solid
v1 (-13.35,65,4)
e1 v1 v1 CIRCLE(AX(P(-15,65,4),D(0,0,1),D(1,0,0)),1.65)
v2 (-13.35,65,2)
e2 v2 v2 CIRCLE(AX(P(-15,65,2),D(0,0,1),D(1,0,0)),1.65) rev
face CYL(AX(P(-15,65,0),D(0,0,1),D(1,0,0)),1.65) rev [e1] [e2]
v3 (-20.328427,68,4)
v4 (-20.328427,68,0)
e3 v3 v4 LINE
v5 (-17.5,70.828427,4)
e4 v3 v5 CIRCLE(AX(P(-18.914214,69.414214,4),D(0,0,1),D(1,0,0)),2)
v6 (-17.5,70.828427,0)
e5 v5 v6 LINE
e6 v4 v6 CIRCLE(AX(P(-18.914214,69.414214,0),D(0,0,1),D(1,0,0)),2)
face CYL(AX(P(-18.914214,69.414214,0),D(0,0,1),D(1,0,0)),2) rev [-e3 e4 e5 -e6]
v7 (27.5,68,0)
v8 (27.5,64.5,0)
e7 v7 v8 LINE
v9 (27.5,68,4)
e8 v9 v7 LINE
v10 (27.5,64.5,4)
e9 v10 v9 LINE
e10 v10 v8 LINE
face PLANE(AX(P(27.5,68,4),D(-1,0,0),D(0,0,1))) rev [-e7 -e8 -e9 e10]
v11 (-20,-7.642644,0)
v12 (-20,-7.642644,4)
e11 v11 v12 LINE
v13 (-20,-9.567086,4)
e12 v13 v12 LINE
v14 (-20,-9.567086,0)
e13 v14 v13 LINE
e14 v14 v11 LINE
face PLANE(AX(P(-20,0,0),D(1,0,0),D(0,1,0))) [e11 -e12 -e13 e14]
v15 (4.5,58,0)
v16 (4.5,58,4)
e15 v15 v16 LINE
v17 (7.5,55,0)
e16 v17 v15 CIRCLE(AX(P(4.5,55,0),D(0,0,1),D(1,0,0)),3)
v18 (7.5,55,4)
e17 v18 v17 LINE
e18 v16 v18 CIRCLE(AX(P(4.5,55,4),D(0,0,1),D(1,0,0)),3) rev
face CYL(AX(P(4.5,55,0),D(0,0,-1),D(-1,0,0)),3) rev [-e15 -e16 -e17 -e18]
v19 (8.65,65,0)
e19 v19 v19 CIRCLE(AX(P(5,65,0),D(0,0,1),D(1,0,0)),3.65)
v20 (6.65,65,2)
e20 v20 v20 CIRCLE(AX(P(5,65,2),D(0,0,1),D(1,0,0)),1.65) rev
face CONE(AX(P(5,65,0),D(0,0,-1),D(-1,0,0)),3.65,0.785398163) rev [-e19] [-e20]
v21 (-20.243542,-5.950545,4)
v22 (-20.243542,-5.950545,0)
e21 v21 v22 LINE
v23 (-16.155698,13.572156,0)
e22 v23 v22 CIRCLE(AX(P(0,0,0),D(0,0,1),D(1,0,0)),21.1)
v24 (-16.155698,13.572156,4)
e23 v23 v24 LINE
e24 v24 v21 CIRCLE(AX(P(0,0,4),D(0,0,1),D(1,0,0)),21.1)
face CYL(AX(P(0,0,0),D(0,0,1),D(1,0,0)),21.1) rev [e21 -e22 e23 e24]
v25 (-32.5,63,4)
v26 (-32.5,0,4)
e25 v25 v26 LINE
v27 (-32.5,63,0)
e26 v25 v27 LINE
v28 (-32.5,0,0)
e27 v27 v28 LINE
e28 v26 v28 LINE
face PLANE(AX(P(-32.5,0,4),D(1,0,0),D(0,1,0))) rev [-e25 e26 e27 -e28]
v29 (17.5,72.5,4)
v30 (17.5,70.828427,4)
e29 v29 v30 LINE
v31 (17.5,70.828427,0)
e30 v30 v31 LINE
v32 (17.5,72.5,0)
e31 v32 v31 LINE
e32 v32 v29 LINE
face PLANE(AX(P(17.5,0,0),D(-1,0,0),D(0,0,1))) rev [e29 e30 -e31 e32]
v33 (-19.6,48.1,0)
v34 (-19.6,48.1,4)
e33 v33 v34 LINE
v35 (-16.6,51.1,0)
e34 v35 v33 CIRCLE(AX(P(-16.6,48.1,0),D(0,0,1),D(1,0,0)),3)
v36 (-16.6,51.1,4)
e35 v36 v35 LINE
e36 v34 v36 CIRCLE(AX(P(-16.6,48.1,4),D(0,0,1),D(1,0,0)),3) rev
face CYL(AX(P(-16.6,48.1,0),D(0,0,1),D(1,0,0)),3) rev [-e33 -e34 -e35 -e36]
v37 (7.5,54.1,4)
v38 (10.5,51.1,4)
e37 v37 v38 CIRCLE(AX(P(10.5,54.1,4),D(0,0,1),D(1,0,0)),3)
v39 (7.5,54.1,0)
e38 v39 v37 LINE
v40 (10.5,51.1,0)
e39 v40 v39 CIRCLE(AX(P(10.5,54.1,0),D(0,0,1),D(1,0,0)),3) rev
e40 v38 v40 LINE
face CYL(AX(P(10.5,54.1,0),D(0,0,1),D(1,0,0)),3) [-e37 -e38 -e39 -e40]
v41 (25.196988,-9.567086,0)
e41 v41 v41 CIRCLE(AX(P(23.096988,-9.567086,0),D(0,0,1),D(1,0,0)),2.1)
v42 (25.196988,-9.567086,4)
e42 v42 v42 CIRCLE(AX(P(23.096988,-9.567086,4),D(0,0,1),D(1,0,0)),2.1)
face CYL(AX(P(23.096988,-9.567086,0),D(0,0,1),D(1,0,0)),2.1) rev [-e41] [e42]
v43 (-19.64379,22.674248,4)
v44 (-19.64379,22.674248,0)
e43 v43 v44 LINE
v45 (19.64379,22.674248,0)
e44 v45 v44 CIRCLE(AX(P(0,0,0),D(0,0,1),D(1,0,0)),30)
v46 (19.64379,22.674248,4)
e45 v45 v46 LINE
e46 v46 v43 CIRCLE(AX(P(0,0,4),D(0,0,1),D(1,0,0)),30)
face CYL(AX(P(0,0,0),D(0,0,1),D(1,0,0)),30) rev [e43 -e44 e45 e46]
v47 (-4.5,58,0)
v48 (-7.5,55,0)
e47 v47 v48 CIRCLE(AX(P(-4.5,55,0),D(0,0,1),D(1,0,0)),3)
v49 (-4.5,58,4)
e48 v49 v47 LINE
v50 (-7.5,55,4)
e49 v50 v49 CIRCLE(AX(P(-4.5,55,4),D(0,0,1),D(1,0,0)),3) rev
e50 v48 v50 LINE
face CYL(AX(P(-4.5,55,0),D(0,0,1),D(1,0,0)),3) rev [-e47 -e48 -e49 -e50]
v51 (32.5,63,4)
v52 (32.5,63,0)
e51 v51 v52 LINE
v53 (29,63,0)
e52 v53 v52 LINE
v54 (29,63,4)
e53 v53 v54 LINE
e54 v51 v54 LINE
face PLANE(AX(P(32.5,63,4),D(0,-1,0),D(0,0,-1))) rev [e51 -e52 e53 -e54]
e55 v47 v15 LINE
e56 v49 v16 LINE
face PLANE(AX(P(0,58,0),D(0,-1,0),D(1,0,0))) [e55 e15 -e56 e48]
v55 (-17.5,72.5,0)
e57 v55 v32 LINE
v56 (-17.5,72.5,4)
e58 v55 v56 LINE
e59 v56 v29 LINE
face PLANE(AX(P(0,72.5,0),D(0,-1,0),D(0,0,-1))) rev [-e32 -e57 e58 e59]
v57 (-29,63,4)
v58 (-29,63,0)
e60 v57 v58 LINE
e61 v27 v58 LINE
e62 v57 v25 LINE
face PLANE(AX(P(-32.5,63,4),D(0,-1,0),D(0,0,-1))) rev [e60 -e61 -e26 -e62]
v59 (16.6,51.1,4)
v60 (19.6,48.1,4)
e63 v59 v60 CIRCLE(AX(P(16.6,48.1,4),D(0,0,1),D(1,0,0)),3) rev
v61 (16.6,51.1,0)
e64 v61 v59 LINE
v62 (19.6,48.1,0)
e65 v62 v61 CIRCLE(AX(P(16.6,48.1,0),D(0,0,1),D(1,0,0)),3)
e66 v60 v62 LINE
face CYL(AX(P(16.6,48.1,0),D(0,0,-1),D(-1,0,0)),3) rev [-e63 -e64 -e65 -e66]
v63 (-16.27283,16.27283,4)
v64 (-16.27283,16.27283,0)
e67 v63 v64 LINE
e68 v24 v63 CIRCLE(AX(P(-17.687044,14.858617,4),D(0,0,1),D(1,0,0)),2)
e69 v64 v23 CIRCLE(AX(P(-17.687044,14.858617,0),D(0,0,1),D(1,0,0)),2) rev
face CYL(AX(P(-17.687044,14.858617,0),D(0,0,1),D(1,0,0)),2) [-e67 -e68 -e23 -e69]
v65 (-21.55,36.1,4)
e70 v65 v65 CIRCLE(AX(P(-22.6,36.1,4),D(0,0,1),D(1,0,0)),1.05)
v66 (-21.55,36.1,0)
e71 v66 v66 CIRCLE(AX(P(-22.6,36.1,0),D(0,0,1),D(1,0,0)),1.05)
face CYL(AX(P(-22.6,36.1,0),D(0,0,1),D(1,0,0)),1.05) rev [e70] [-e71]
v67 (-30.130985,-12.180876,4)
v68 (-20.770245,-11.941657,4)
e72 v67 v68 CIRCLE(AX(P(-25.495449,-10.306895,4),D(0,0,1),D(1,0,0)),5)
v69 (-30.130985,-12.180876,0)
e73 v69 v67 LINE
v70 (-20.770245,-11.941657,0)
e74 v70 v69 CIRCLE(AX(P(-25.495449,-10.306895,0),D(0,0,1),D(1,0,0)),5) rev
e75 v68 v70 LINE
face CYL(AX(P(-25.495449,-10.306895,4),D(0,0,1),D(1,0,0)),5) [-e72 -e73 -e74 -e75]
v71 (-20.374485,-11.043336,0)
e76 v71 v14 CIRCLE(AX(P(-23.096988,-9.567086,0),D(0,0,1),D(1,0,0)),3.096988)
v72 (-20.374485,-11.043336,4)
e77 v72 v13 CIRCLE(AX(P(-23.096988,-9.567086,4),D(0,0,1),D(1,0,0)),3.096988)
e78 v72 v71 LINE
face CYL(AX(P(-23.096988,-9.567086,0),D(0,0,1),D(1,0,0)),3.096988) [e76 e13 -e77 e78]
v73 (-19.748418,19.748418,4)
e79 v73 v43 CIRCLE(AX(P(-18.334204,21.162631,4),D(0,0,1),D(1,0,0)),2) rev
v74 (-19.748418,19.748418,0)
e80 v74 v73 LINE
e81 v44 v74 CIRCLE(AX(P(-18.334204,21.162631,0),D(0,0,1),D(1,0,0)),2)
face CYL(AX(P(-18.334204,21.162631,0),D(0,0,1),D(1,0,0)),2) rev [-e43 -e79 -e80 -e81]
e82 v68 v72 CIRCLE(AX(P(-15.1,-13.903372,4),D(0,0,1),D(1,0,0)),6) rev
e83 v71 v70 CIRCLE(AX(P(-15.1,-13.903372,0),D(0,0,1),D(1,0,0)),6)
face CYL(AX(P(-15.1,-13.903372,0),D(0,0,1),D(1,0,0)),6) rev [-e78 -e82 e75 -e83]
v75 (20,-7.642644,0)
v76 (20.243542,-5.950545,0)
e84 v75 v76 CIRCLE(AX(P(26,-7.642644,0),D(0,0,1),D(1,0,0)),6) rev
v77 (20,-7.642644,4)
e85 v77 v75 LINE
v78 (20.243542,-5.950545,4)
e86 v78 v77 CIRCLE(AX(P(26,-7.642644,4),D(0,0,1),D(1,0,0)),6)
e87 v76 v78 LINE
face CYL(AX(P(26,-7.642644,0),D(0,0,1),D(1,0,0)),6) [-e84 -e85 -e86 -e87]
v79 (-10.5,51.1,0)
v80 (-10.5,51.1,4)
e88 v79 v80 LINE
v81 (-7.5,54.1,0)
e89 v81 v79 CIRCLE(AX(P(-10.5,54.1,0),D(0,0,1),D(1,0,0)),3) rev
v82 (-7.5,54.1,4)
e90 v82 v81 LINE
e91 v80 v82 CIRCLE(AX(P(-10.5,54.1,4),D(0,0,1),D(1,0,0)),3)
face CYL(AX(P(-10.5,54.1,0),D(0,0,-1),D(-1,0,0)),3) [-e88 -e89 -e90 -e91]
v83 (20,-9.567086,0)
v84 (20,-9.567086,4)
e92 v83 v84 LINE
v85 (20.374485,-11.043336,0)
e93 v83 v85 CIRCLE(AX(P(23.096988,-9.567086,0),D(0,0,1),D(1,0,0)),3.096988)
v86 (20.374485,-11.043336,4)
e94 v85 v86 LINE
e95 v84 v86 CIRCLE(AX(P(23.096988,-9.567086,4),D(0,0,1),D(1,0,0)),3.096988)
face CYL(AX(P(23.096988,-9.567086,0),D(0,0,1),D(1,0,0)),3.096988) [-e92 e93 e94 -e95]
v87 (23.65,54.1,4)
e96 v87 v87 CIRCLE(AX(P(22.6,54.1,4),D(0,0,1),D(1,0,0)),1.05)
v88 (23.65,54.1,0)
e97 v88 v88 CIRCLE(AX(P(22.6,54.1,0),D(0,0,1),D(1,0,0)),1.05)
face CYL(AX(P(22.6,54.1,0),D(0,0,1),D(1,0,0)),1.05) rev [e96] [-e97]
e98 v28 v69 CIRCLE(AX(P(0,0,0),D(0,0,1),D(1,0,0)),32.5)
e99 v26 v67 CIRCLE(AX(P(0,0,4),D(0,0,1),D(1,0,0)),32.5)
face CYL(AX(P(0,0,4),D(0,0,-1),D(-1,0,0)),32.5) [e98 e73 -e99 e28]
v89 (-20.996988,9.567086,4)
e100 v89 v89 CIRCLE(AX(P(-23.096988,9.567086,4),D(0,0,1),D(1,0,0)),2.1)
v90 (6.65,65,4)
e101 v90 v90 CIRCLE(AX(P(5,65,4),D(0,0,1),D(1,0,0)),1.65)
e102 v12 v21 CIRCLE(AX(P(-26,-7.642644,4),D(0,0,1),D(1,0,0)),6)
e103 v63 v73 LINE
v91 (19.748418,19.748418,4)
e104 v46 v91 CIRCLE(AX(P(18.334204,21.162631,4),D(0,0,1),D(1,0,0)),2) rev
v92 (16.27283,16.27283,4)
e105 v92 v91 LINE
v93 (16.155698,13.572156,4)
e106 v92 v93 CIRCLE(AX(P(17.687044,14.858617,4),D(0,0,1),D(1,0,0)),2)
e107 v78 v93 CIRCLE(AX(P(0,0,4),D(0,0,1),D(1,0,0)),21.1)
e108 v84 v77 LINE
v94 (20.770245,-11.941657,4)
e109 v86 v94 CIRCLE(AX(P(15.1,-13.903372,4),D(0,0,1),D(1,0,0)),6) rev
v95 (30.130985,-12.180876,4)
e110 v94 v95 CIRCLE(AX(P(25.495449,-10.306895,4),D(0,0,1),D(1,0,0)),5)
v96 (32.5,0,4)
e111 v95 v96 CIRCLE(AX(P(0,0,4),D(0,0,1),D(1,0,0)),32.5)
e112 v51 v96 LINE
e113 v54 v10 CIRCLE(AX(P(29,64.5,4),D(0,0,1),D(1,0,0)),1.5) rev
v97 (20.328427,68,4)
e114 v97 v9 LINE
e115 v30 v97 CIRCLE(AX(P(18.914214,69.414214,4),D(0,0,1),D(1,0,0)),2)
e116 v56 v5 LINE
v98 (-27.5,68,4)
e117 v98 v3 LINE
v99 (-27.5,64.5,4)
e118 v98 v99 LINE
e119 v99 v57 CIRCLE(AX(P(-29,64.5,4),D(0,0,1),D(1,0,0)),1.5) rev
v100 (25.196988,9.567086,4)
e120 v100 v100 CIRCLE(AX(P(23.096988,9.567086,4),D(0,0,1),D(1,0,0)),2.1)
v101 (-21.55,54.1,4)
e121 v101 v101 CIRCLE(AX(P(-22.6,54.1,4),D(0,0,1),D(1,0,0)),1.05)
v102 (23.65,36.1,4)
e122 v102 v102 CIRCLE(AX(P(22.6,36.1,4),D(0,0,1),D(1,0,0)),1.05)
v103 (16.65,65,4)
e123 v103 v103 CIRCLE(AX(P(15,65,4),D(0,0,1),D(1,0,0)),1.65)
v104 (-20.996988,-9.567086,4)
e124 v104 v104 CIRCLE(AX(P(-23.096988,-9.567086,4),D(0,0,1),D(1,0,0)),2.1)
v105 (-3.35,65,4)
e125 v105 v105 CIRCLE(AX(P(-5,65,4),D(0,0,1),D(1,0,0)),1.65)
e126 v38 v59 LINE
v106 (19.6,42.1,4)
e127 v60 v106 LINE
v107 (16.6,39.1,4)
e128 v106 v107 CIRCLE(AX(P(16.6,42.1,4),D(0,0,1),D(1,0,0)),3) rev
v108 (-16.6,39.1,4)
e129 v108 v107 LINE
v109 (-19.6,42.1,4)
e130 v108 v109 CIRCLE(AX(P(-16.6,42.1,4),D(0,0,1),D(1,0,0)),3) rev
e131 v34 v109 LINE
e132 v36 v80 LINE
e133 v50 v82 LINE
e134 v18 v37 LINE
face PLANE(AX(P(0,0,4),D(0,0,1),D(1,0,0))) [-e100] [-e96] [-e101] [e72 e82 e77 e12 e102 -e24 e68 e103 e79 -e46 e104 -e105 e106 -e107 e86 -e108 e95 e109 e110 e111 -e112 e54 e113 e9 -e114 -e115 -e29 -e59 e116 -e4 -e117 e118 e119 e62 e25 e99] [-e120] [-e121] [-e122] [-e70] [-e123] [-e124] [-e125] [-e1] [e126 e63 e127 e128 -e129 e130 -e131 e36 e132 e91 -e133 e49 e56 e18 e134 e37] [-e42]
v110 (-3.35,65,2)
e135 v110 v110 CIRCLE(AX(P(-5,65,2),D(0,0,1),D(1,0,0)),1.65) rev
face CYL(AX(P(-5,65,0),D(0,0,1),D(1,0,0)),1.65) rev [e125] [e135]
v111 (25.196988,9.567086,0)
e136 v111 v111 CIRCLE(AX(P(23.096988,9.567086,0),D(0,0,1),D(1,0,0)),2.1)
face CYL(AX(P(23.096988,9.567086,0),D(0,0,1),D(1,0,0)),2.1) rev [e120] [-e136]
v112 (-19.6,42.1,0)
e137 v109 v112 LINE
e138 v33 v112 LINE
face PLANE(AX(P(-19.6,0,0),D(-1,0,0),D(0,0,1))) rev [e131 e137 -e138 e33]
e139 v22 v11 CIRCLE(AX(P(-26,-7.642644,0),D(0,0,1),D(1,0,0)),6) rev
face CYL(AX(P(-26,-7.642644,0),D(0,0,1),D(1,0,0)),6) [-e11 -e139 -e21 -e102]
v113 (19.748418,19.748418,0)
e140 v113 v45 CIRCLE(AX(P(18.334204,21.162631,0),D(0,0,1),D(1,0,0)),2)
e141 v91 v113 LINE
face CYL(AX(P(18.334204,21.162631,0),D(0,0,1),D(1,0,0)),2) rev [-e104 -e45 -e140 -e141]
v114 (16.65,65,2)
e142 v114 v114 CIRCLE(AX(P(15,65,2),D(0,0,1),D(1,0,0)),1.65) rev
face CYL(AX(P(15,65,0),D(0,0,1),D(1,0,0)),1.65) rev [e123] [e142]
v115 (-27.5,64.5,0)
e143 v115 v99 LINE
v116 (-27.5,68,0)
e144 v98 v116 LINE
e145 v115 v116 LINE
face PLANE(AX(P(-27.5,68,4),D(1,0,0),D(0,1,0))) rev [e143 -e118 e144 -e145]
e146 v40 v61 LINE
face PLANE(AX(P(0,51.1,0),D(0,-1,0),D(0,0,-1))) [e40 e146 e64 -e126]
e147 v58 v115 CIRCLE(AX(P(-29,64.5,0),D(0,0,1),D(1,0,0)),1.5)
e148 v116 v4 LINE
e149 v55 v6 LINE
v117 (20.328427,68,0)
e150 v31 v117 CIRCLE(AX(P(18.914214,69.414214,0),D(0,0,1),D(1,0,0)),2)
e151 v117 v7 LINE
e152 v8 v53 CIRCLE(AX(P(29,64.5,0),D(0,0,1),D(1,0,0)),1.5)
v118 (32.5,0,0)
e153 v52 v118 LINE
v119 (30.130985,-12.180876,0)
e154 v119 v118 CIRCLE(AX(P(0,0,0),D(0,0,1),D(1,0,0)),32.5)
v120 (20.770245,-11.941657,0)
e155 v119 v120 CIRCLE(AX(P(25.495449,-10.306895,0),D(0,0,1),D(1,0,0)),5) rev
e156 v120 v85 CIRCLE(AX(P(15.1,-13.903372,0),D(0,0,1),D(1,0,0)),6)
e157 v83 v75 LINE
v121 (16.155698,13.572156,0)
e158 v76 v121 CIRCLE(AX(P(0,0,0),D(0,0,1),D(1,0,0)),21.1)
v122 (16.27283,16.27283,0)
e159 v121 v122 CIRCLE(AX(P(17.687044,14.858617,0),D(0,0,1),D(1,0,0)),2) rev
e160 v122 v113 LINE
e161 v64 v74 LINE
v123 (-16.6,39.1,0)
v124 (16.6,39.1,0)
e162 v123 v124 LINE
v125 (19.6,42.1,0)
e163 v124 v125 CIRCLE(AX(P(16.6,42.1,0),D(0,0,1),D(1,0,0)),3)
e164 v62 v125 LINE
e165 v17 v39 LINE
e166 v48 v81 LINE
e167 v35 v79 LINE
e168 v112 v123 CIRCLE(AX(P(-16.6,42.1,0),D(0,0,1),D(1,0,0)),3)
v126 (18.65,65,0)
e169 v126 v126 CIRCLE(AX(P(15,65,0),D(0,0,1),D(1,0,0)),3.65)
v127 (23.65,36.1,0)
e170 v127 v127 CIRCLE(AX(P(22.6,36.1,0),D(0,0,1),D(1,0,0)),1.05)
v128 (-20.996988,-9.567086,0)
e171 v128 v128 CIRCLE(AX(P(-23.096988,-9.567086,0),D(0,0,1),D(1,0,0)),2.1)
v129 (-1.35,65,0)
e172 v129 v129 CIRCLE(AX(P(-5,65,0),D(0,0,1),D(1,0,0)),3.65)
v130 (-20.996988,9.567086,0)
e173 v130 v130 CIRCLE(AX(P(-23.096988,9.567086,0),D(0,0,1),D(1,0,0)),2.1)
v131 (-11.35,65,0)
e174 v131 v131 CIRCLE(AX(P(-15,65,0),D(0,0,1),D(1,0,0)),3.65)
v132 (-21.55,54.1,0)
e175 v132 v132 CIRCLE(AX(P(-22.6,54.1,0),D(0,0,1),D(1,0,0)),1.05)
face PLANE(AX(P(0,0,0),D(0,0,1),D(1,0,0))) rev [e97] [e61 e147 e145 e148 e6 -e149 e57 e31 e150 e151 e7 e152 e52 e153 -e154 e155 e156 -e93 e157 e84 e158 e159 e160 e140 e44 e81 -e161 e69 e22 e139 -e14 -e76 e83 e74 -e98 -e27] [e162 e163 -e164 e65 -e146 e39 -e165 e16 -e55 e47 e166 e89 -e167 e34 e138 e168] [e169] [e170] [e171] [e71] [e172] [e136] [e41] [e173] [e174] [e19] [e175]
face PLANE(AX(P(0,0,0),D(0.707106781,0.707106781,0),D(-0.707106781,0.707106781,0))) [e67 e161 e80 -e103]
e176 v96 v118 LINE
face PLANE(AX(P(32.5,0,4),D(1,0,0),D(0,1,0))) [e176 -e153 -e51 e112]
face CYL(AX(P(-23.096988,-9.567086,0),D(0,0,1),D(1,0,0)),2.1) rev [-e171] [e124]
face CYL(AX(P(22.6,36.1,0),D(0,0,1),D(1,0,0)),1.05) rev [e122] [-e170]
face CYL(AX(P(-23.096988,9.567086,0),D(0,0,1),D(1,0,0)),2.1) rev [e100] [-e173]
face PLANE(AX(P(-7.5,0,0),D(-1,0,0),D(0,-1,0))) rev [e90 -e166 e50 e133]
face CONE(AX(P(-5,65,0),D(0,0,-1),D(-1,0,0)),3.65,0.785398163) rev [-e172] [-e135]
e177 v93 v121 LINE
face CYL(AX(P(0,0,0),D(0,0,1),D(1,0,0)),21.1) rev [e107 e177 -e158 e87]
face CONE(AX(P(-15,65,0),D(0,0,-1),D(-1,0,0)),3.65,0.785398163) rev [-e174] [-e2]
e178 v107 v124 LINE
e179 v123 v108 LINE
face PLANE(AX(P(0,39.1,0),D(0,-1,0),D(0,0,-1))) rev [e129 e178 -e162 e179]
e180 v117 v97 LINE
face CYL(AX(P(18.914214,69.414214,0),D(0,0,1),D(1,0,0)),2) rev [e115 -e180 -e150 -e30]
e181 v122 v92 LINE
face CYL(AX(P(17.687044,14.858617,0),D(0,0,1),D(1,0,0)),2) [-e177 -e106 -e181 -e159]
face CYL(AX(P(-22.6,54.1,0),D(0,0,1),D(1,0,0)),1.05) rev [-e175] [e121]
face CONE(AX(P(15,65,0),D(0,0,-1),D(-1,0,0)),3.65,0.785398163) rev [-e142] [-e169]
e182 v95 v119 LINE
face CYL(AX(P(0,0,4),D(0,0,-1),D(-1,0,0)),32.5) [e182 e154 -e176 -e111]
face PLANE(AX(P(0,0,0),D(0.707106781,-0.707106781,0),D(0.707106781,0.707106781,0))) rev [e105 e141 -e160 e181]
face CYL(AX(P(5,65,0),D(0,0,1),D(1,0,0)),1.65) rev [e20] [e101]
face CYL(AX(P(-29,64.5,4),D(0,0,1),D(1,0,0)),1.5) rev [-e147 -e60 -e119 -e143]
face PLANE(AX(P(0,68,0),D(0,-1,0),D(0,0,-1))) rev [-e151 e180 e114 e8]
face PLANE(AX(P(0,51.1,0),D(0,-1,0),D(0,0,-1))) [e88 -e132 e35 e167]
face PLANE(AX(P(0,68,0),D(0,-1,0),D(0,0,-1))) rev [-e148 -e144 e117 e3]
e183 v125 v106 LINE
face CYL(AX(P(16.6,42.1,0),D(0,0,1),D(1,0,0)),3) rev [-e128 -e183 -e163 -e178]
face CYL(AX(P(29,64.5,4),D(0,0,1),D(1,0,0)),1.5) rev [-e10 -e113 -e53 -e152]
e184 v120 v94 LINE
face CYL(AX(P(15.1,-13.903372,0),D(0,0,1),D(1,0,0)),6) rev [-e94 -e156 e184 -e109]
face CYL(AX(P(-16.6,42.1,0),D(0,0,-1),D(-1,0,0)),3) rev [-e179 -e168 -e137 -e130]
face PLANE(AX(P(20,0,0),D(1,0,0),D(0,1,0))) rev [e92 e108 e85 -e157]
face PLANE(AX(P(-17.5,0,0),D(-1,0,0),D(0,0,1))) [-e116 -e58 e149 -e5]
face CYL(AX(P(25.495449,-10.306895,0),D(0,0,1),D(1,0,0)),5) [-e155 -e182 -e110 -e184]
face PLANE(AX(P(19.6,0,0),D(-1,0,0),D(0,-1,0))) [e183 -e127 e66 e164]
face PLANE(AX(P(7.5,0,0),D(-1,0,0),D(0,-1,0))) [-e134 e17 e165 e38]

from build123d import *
from build123d.topology import SkipClean

# Parameters (mm, degrees)
EXTRUDE_1_DEPTH          = 4
CUT_EXTRUDE_1_DEPTH      = 87.442177205
CUT_EXTRUDE_1_DEPTH_BACK = 87.442177205
SKETCH_2_R               = 21.1
SKETCH_2_W               = 42.2
SKETCH_2_H               = 49.697757749
SKETCH_3_R               = 1.65
CUT_EXTRUDE_2_DEPTH      = 87.442177205
PATTERN_CIRCULAR_1_COUNT = 8
EXTRUDE_START            = -4
EXTRUDE_2_DEPTH          = 4
FILLET_1_R               = 6
CUT_EXTRUDE_3_DEPTH      = 87.442177205
CUT_EXTRUDE_3_DEPTH_BACK = 87.442177205
SKETCH_6_R               = 1.65
FILLET_2_R               = 2
CUT_EXTRUDE_4_DEPTH      = 87.442177205
SKETCH_8_R               = 2
CUT_EXTRUDE_5_DEPTH      = 80.551869871
CUT_EXTRUDE_6_DEPTH      = 80.551869871
CUT_EXTRUDE_6_DEPTH_BACK = 80.551869871
SKETCH_9_R               = 1.65
SKETCH_21_R              = 1.05
CUT_EXTRUDE_C620_DEPTH   = 182.304079666
CHAMFER_2_SIZE           = 2
FILLET_3_R               = 5
FILLET_4_R               = 5
CUT_EXTRUDE_7_DEPTH      = 80.551869871
CUT_EXTRUDE_7_DEPTH_BACK = 80.551869871
SKETCH_22_W              = 39.2
SKETCH_22_H              = 12
SKETCH_22_W_2            = 15
SKETCH_22_H_2            = 6.9
FILLET_5_R               = 3
CUT_EXTRUDE_8_DEPTH      = 80.551869871
CUT_EXTRUDE_8_DEPTH_BACK = 80.551869871
SKETCH_23_R              = 2.1
CUT_EXTRUDE_9_DEPTH      = 80.551869871
CUT_EXTRUDE_9_DEPTH_BACK = 80.551869871
SKETCH_24_W              = 5
SKETCH_24_H              = 5
FILLET_6_R               = 1.5


with BuildPart() as part:
    # 草图1 → 凸台-拉伸1 (new body)
    with BuildSketch(Plane.XY):
        with BuildLine():
            Line((32.5, 80), (-32.5, 80))
            Line((-32.5, 80), (-32.5, 0))
            ThreePointArc((-32.5, 0), (0, 32.5), (32.5, 0))
            Line((32.5, 0), (32.5, 80))
        make_face()
        with BuildLine():
            ThreePointArc((32.5, 0), (0, 32.5), (-32.5, 0))
            Line((-32.5, 0), (32.5, 0))
        make_face()
        with BuildLine():
            Line((32.5, 0), (-32.5, 0))
            ThreePointArc((-32.5, 0), (0, -32.5), (32.5, 0))
        make_face()
        with BuildLine():
            ThreePointArc((32.5, 0), (0, 32.5), (-32.5, 0))
            Line((-32.5, 0), (32.5, 0))
        make_face()
        with BuildLine():
            Line((32.5, 0), (-32.5, 0))
            ThreePointArc((-32.5, 0), (0, -32.5), (32.5, 0))
        make_face()
    extrude(amount=EXTRUDE_1_DEPTH)

    # 草图2 → 切除-拉伸1 (cut, two sides: drawn at the far end of the back side and taken through both)
    with BuildSketch(Plane.XY.offset(4).offset(-CUT_EXTRUDE_1_DEPTH_BACK)):
        Circle(SKETCH_2_R)
        with Locations((0, -24.848878875)):
            Rectangle(SKETCH_2_W, SKETCH_2_H)
    extrude(amount=CUT_EXTRUDE_1_DEPTH + CUT_EXTRUDE_1_DEPTH_BACK, mode=Mode.SUBTRACT)

    # 草图3 → 切除-拉伸2 (cut, symmetric)
    with BuildSketch(Plane.XY.offset(4)):
        with Locations((9.567085809, 23.096988313)):
            Circle(SKETCH_3_R)
    cut_extrude_2 = extrude(amount=CUT_EXTRUDE_2_DEPTH, both=True, mode=Mode.SUBTRACT)

    # 阵列(圆周)1: 切除-拉伸2 ×8 about axis
    pattern_circular_1_axis = Axis((0, 0, 0), (0, 0, 1))
    for i in range(1, PATTERN_CIRCULAR_1_COUNT):
        add(cut_extrude_2.rotate(pattern_circular_1_axis, i * 360 / PATTERN_CIRCULAR_1_COUNT), mode=Mode.SUBTRACT)

    # 草图4 → 凸台-拉伸2 (add)
    with SkipClean():  # the faces are left unmerged after this step: merging them gives an invalid solid
        with BuildSketch(Plane.XY.offset(4).offset(EXTRUDE_START)):
            with BuildLine():
                ThreePointArc((-21.1, -11.934230563), (-20.288431203, -10.872207862), (-20, -9.567085809))
                Line((-20, -9.567085809), (-20, -6.72383819))
                ThreePointArc((-20, -6.72383819), (-20.823184195, -3.406611219), (-21.1, 0))
                Line((-21.1, 0), (-21.1, -11.934230563))
            make_face()
            with BuildLine():
                ThreePointArc((21.1, 0), (20.823184195, -3.406611219), (20, -6.72383819))
                Line((20, -6.72383819), (20, -9.567085809))
                ThreePointArc((20, -9.567085809), (20.288431203, -10.872207862), (21.1, -11.934230563))
                Line((21.1, -11.934230563), (21.1, 0))
            make_face()
        extrude(amount=EXTRUDE_2_DEPTH)

    # 圆角1
    fillet_1_edges = [part.edges().sort_by_distance(p)[0] for p in [
        (21.1, -11.934230563, 2),
        (20, -6.72383819, 2),
        (-21.1, -11.934230563, 2),
        (-20, -6.72383819, 2),
    ]]
    fillet(fillet_1_edges, radius=FILLET_1_R)

    # 草图6 → 切除-拉伸3 (cut, two sides: drawn at the far end of the back side and taken through both)
    # profile 1 of 4: a face of its own
    with SkipClean():  # the faces are left unmerged after this step: merging them gives an invalid solid
        with BuildSketch(Plane.XY.offset(4).offset(-CUT_EXTRUDE_3_DEPTH_BACK)):
            with BuildLine():
                Line((0, 30), (0, 21.1))
                ThreePointArc((0, 21.1), (8.074620423, 19.493858136), (14.919953083, 14.919953083))
                Line((14.919953083, 14.919953083), (21.213203436, 21.213203436))
                ThreePointArc((21.213203436, 21.213203436), (11.480502971, 27.716385975), (0, 30))
            make_face()
            with Locations((9.567085809, 23.096988313)):
                Circle(SKETCH_6_R, mode=Mode.SUBTRACT)
        # profile 2 of 4: a face of its own
        with BuildSketch(Plane.XY.offset(4).offset(-CUT_EXTRUDE_3_DEPTH_BACK)):
            with BuildLine():
                ThreePointArc((-14.919953083, 14.919953083), (-8.074620423, 19.493858136), (0, 21.1))
                Line((0, 21.1), (0, 30))
                ThreePointArc((0, 30), (-11.480502971, 27.716385975), (-21.213203436, 21.213203436))
                Line((-21.213203436, 21.213203436), (-14.919953083, 14.919953083))
            make_face()
            with Locations((-9.567085809, 23.096988313)):
                Circle(SKETCH_6_R, mode=Mode.SUBTRACT)
        # profile 3 of 4: a face of its own
        with BuildSketch(Plane.XY.offset(4).offset(-CUT_EXTRUDE_3_DEPTH_BACK)):
            with BuildLine():
                Line((-14.919953083, 14.919953083), (0, 0))
                Line((0, 0), (0, 21.1))
                ThreePointArc((0, 21.1), (-8.074620423, 19.493858136), (-14.919953083, 14.919953083))
            make_face()
        # profile 4 of 4: a face of its own
        with BuildSketch(Plane.XY.offset(4).offset(-CUT_EXTRUDE_3_DEPTH_BACK)):
            with BuildLine():
                Line((0, 21.1), (0, 0))
                Line((0, 0), (14.919953083, 14.919953083))
                ThreePointArc((14.919953083, 14.919953083), (8.074620423, 19.493858136), (0, 21.1))
            make_face()
        extrude(amount=CUT_EXTRUDE_3_DEPTH + CUT_EXTRUDE_3_DEPTH_BACK, mode=Mode.SUBTRACT)

    # 圆角2
    fillet_2_edges = [part.edges().sort_by_distance(p)[0] for p in [
        (-14.919953083, 14.919953083, 2),
        (14.919953083, 14.919953083, 2),
        (21.213203436, 21.213203436, 2),
        (-21.213203436, 21.213203436, 2),
    ]]
    fillet(fillet_2_edges, radius=FILLET_2_R)

    # 草图7 → 切除-拉伸4 (cut, through all)
    with SkipClean():  # the faces are left unmerged after this step: merging them gives an invalid solid
        with BuildSketch(Plane.XY.offset(4)):
            Polygon((-32.5, 80), (-32.5, 68), (-17.5, 68), (-17.5, 72.5), (17.5, 72.5), (17.5, 68), (32.5, 68), (32.5, 80), align=None)
        extrude(amount=-CUT_EXTRUDE_4_DEPTH, mode=Mode.SUBTRACT)

    # 草图8 → 切除-拉伸5 (cut, through all)
    with SkipClean():  # the faces are left unmerged after this step: merging them gives an invalid solid
        with BuildSketch(Plane.XY.offset(4)):
            with Locations((-18.914213562, 69.414213562)):
                Circle(SKETCH_8_R)
            with Locations((18.914213562, 69.414213562)):
                Circle(SKETCH_8_R)
        extrude(amount=-CUT_EXTRUDE_5_DEPTH, mode=Mode.SUBTRACT)

    # 草图9 → 切除-拉伸6 (cut, two sides: drawn at the far end of the back side and taken through both)
    with SkipClean():  # the faces are left unmerged after this step: merging them gives an invalid solid
        with BuildSketch(Plane.XY.offset(4).offset(-CUT_EXTRUDE_6_DEPTH_BACK)):
            with Locations((5, 65)):
                Circle(SKETCH_9_R)
            with Locations((15, 65)):
                Circle(SKETCH_9_R)
            with Locations((-5, 65)):
                Circle(SKETCH_9_R)
            with Locations((-15, 65)):
                Circle(SKETCH_9_R)
        extrude(amount=CUT_EXTRUDE_6_DEPTH + CUT_EXTRUDE_6_DEPTH_BACK, mode=Mode.SUBTRACT)

    # 草图21 → C620孔位 (cut, through all)
    with SkipClean():  # the faces are left unmerged after this step: merging them gives an invalid solid
        with BuildSketch(Plane(origin=(-123.742438545, -19.388354545, 4), x_dir=(1, 0, 0), z_dir=(0, 0, 1))):
            with Locations((146.342438545, 55.488354545)):
                Circle(SKETCH_21_R)
            with Locations((101.142438545, 55.488354545)):
                Circle(SKETCH_21_R)
            with Locations((101.142438545, 73.488354545)):
                Circle(SKETCH_21_R)
            with Locations((146.342438545, 73.488354545)):
                Circle(SKETCH_21_R)
        extrude(amount=-CUT_EXTRUDE_C620_DEPTH, mode=Mode.SUBTRACT)

    # 倒角2
    chamfer_2_edges = [part.edges().sort_by_distance(p)[0] for p in [
        (-16.65, 65, 0),
        (-6.65, 65, 0),
        (13.35, 65, 0),
        (3.35, 65, 0),
    ]]
    chamfer(chamfer_2_edges, length=CHAMFER_2_SIZE)

    # 圆角3
    # the kernel refuses this fillet: 5 mm, written as the material it takes off along each edge
    with BuildSketch(Plane(origin=(21.1, -24.719223289, 42.630367083), x_dir=(-0.025798763537540494, 0.9996671565075718, 0), z_dir=(0, 0, -1))) as fillet_3_piece_1:
        with BuildLine():
            CenterArc((14.294133967, 4.765806115), FILLET_3_R, 113.490040764, 138.904380638)
            Line((12.301185676, 9.351452974), (12.101890847, 9.81001766))
            ThreePointArc((12.101890847, 9.81001766), (5.284147412, 5.815475154), (-0.388543839, 0.314696179))
            Line((-0.388543839, 0.314696179), (0.012899382, -0.499833578))
            ThreePointArc((0.012899382, -0.499833578), (10.825151105, -0.220797978), (12.630589135, -0.476580612))
            Line((12.630589135, -0.476580612), (12.781820484, 0))
        make_face()
    extrude(amount=81.260734166, mode=Mode.SUBTRACT)

    # 圆角4
    # the kernel refuses this fillet: 5 mm, written as the material it takes off along each edge
    with BuildSketch(Plane(origin=(-21.1, -24.719223289, 42.630367083), x_dir=(0.025798763537535546, 0.999667156507572, 0), z_dir=(0, 0, -1))) as fillet_4_piece_1:
        with BuildLine():
            CenterArc((14.294133967, -4.765806115), FILLET_4_R, 107.605578598, 138.904380638)
            Line((12.301185676, -9.351452974), (12.101890847, -9.81001766))
            ThreePointArc((12.101890847, -9.81001766), (5.284147412, -5.815475154), (-0.388543839, -0.314696179))
            Line((-0.388543839, -0.314696179), (0.012899382, 0.499833578))
            ThreePointArc((0.012899382, 0.499833578), (10.825151105, 0.220797978), (12.630589135, 0.476580612))
            Line((12.630589135, 0.476580612), (12.781820484, 0))
        make_face()
    extrude(amount=81.260734166, mode=Mode.SUBTRACT)

    # 草图22 → 切除-拉伸7 (cut, two sides: drawn at the far end of the back side and taken through both)
    with SkipClean():  # the faces are left unmerged after this step: merging them gives an invalid solid
        with BuildSketch(Plane.XY.offset(4).offset(-CUT_EXTRUDE_7_DEPTH_BACK)):
            with Locations((0, 45.1)):
                Rectangle(SKETCH_22_W, SKETCH_22_H)
            with Locations((0, 54.55)):
                Rectangle(SKETCH_22_W_2, SKETCH_22_H_2)
        extrude(amount=CUT_EXTRUDE_7_DEPTH + CUT_EXTRUDE_7_DEPTH_BACK, mode=Mode.SUBTRACT)

    # 圆角5
    fillet_5_edges = [part.edges().sort_by_distance(p)[0] for p in [
        (-19.6, 51.1, 2),
        (-7.5, 51.1, 2),
        (-7.5, 58, 2),
        (7.5, 58, 2),
        (7.5, 51.1, 2),
        (19.6, 51.1, 2),
        (19.6, 39.1, 2),
        (-19.6, 39.1, 2),
    ]]
    fillet(fillet_5_edges, radius=FILLET_5_R)

    # 草图23 → 切除-拉伸8 (cut, two sides: drawn at the far end of the back side and taken through both)
    with SkipClean():  # the faces are left unmerged after this step: merging them gives an invalid solid
        with BuildSketch(Plane.XY.offset(4).offset(-CUT_EXTRUDE_8_DEPTH_BACK)):
            with Locations((23.096988313, 9.567085809)):
                Circle(SKETCH_23_R)
            with Locations((23.096988313, -9.567085809)):
                Circle(SKETCH_23_R)
            with Locations((-23.096988313, 9.567085809)):
                Circle(SKETCH_23_R)
            with Locations((-23.096988313, -9.567085809)):
                Circle(SKETCH_23_R)
        extrude(amount=CUT_EXTRUDE_8_DEPTH + CUT_EXTRUDE_8_DEPTH_BACK, mode=Mode.SUBTRACT)

    # 草图24 → 切除-拉伸9 (cut, two sides: drawn at the far end of the back side and taken through both)
    with SkipClean():  # the faces are left unmerged after this step: merging them gives an invalid solid
        with BuildSketch(Plane(origin=(0, 0, 0), x_dir=(-1, 0, 0), z_dir=(0, 0, -1)).offset(-CUT_EXTRUDE_9_DEPTH_BACK)):
            with Locations((30, 65.5)):
                Rectangle(SKETCH_24_W, SKETCH_24_H)
            with Locations((-30, 65.5)):
                Rectangle(SKETCH_24_W, SKETCH_24_H)
        extrude(amount=CUT_EXTRUDE_9_DEPTH + CUT_EXTRUDE_9_DEPTH_BACK, mode=Mode.SUBTRACT)

    # 圆角6
    fillet_6_edges = [part.edges().sort_by_distance(p)[0] for p in [
        (-27.5, 63, 2),
        (27.5, 63, 2),
    ]]
    fillet(fillet_6_edges, radius=FILLET_6_R)


solid = part.part
